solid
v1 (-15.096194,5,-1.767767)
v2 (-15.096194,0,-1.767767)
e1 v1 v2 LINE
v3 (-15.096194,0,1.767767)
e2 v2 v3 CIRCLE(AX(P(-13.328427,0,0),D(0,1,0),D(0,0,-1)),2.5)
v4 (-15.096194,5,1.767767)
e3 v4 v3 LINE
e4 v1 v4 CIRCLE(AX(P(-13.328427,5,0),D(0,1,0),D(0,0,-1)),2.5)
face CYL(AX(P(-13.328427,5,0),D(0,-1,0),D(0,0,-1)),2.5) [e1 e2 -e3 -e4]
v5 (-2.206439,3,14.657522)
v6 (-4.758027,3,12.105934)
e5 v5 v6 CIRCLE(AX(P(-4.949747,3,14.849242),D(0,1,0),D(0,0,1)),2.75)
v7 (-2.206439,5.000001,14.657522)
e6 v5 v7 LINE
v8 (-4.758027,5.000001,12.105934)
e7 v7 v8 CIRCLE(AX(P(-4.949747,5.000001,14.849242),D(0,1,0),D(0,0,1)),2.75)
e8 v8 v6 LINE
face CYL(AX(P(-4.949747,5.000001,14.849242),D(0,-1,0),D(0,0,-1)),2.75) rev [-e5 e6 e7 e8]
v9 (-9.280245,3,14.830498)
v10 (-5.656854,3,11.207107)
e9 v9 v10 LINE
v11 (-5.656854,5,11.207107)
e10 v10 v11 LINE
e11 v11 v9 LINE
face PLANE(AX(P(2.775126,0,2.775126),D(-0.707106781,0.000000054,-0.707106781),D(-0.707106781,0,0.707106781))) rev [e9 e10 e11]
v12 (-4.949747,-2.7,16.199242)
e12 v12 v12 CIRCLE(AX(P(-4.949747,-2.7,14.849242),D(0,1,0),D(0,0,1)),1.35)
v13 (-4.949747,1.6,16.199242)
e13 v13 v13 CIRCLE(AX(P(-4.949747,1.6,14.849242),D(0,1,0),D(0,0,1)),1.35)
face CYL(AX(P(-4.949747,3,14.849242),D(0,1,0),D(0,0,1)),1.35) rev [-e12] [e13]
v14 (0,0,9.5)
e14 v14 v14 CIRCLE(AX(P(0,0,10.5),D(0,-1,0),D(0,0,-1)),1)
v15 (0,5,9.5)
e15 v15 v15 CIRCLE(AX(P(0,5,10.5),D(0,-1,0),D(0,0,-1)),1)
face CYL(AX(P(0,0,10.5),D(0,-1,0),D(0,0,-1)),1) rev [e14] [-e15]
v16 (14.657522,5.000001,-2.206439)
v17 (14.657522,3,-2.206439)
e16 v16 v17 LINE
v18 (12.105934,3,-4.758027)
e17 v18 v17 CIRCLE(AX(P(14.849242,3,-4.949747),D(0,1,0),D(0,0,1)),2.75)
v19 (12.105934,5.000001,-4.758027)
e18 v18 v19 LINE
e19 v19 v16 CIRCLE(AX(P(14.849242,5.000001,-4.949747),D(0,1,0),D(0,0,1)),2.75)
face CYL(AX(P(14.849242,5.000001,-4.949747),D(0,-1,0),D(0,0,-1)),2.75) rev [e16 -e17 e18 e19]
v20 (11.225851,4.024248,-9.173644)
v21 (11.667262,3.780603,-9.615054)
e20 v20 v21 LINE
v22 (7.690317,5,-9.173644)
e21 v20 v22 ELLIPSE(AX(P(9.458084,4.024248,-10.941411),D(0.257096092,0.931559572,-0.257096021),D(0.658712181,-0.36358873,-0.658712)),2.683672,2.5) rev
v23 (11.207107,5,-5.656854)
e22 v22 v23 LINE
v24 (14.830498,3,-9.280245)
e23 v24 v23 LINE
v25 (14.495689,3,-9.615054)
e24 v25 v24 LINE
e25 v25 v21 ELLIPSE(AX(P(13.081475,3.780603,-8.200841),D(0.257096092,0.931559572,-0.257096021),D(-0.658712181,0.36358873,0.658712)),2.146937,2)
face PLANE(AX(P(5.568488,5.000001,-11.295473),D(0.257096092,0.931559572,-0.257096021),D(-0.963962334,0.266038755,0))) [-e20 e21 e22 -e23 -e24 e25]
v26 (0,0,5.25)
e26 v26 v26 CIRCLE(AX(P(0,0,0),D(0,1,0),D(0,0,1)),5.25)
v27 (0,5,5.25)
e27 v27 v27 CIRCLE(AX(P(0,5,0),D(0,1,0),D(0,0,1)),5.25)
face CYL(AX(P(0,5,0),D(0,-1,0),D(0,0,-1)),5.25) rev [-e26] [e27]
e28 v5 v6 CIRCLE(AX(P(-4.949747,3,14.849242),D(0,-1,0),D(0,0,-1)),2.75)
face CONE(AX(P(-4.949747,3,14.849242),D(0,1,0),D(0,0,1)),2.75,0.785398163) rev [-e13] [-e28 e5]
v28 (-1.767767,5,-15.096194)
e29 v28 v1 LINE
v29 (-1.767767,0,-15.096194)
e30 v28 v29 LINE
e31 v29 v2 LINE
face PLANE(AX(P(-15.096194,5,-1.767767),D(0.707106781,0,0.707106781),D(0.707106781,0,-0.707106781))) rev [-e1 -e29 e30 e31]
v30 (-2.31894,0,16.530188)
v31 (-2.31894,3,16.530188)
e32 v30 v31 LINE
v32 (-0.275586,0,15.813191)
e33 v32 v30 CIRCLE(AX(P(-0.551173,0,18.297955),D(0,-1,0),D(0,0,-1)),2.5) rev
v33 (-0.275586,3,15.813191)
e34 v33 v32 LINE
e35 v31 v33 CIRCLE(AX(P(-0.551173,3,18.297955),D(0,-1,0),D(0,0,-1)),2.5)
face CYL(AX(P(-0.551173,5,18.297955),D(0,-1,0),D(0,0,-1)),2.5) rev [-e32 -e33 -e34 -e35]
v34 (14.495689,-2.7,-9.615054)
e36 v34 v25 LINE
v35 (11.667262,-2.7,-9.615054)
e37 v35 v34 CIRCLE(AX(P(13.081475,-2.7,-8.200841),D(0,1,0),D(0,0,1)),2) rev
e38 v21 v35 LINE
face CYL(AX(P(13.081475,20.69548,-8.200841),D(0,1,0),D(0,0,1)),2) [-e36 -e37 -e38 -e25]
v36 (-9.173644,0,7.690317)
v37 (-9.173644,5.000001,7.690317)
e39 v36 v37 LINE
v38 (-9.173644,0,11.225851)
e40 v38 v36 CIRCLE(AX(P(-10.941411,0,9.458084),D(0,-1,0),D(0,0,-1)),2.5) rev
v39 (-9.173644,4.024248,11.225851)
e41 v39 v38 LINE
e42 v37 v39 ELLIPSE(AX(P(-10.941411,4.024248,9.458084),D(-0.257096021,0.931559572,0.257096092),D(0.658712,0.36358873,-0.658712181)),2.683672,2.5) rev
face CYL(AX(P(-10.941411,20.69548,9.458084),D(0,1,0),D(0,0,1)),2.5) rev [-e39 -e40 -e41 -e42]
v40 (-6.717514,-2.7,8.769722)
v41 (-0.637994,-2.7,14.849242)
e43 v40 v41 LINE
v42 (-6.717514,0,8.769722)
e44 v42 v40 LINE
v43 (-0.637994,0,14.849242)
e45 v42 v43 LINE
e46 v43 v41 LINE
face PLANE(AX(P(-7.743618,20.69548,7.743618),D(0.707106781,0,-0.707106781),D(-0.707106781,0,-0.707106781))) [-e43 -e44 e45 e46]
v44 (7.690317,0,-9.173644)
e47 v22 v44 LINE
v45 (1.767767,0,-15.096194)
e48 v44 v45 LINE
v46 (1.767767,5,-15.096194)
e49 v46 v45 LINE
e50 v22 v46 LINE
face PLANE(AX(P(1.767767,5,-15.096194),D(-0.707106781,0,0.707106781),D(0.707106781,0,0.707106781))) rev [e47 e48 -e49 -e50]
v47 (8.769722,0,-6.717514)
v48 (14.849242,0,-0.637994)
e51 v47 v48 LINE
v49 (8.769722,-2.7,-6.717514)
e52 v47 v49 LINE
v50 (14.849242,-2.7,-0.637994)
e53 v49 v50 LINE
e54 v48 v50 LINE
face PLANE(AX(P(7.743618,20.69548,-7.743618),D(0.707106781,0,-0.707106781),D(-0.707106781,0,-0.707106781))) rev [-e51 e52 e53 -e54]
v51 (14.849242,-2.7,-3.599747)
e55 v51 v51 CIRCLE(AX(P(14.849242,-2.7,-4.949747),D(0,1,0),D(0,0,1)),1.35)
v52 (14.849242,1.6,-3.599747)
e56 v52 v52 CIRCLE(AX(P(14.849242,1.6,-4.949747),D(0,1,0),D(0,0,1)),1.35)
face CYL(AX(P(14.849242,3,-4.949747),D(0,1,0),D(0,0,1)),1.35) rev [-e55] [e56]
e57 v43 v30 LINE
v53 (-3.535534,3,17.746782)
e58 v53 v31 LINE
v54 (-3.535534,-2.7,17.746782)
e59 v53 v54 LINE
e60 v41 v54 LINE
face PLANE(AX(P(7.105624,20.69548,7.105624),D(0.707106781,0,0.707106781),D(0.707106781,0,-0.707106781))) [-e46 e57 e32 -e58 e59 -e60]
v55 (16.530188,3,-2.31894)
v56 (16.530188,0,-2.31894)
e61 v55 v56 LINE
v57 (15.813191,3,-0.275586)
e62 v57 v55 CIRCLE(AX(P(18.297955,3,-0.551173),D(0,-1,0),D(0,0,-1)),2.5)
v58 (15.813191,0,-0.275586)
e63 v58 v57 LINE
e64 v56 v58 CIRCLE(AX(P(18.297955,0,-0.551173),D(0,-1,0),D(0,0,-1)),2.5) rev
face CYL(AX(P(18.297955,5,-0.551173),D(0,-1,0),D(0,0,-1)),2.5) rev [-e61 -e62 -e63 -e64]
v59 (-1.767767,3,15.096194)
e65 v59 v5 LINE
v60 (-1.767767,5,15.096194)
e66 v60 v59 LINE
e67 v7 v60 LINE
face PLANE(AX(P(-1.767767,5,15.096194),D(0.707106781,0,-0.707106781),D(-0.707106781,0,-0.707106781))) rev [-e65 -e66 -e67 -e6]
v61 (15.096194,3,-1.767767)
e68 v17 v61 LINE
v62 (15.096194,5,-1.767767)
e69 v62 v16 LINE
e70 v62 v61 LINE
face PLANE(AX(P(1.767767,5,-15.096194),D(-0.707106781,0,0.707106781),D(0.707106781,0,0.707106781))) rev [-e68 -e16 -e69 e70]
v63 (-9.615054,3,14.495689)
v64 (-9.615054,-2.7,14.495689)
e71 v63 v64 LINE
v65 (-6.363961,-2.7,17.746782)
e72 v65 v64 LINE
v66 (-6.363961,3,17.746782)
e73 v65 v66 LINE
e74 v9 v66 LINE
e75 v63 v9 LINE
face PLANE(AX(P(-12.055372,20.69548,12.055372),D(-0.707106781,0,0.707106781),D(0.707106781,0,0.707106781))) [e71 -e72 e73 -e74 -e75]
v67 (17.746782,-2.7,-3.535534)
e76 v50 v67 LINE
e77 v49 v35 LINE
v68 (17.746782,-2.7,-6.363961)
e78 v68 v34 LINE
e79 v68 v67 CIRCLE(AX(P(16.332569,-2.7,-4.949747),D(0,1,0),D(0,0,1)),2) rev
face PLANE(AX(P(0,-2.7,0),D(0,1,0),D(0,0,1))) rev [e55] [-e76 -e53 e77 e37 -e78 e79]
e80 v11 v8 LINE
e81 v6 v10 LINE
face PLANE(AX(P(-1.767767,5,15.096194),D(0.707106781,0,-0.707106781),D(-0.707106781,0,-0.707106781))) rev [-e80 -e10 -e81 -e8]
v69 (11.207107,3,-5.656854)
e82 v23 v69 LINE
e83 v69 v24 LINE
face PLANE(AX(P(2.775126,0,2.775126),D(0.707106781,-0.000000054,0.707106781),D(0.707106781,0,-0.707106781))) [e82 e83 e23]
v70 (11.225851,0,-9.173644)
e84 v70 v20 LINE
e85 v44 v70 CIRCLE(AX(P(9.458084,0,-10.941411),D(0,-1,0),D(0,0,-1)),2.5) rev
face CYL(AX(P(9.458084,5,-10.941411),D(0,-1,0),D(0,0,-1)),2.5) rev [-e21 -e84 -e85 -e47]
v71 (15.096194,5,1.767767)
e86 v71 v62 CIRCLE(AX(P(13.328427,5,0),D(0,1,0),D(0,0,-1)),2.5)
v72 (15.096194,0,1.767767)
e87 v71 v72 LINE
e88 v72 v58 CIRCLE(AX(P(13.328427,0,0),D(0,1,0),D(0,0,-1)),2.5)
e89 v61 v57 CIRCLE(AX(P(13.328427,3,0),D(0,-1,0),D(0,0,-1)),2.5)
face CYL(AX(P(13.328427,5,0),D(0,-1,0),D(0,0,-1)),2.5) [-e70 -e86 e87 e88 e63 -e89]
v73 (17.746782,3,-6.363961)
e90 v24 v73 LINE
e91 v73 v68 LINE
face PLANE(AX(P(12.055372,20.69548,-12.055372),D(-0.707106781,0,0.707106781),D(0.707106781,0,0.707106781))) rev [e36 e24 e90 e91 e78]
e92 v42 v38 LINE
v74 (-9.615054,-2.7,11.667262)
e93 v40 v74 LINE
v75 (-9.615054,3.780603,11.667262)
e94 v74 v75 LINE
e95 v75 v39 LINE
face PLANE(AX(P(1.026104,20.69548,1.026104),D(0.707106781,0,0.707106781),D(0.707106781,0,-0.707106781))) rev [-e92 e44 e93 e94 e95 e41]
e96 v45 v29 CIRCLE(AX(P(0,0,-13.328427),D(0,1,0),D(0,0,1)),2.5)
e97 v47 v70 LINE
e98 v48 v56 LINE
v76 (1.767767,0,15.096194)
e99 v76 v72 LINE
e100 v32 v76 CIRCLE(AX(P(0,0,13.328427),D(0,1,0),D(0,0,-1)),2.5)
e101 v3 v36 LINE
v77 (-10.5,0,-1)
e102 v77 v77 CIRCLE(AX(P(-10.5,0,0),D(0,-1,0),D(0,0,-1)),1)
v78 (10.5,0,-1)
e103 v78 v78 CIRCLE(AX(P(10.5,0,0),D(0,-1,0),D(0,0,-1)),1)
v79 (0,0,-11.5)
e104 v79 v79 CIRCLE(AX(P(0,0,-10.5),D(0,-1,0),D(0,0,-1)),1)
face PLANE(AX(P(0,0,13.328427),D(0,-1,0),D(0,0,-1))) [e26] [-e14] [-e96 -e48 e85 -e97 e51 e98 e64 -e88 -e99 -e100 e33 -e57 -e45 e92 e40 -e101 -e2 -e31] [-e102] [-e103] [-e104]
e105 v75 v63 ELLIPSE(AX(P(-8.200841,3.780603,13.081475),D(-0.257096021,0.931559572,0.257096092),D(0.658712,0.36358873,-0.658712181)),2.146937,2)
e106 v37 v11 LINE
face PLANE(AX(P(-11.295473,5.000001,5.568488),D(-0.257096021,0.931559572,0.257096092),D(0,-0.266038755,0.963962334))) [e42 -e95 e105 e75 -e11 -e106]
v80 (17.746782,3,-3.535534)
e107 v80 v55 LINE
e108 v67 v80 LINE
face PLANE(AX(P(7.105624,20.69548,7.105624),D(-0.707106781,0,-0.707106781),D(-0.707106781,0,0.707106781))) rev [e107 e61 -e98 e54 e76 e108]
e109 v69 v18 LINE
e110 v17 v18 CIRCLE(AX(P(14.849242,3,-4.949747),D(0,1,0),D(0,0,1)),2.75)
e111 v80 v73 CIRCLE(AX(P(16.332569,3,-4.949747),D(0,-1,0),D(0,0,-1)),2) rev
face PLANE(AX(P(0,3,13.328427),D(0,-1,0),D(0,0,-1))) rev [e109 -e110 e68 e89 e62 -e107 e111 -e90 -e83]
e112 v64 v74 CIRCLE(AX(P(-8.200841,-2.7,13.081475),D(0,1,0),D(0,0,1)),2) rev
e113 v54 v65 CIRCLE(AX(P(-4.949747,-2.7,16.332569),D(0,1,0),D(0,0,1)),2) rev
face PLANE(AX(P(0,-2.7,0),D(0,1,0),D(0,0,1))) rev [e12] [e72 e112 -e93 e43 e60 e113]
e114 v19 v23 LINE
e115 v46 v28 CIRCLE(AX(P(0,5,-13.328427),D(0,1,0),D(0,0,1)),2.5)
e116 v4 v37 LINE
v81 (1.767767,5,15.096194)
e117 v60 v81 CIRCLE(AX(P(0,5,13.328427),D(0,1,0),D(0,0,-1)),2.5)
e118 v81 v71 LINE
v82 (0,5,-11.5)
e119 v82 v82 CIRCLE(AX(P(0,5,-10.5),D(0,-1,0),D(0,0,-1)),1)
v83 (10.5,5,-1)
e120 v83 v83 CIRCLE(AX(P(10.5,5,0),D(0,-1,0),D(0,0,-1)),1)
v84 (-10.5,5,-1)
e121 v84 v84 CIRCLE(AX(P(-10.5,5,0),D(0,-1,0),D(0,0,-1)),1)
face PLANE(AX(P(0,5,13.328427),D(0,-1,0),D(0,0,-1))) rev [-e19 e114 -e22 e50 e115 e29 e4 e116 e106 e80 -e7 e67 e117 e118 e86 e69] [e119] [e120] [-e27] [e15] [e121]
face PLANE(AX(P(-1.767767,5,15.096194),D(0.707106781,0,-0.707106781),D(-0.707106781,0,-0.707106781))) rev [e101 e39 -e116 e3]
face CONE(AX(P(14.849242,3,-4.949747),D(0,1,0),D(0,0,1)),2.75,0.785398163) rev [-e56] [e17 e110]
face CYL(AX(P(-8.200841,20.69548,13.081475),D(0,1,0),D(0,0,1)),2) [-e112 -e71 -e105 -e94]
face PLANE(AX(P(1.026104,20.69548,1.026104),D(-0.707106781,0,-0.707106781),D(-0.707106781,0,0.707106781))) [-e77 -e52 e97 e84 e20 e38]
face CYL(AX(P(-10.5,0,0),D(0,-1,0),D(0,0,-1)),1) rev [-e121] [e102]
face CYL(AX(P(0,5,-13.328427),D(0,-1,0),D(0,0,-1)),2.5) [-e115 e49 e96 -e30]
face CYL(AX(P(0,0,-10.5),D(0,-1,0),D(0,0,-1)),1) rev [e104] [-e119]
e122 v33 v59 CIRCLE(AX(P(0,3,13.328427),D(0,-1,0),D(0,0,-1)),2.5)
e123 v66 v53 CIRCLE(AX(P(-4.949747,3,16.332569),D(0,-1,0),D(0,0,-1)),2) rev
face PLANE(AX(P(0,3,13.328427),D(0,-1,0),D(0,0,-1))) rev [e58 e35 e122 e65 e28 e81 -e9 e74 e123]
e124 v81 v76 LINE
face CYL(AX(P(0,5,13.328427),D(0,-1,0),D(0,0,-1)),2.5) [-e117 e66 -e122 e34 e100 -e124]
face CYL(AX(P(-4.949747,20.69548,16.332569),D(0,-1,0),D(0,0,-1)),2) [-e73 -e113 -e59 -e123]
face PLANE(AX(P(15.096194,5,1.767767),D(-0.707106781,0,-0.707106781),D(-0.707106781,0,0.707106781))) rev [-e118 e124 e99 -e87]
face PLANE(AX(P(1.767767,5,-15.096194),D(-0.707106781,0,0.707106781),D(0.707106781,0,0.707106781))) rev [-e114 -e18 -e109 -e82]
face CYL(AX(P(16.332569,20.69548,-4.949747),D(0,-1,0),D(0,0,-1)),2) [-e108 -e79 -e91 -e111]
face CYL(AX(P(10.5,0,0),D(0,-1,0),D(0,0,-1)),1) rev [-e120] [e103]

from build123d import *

# Parameters (mm, degrees)
SKETCH1_R                                      = 0.5
SKETCH1_R_2                                    = 5.25
BOSS_EXTRUDE1_DEPTH                            = 5
SKETCH3_R                                      = 1.3
BOSS_EXTRUDE4_DEPTH                            = 5.7
BOSS_EXTRUDE6_DEPTH                            = 2.473491095
FILLET1_R                                      = 2.5
FILLET2_R                                      = 2
F_2_0MM_DOWEL_HOLE1_D                          = 2
F_2_0MM_DOWEL_HOLE1_DEPTH                      = 42.93
F_2_0MM_DOWEL_HOLE1_TIP                        = 0.600860619
CSK_FOR_M2_5_FLAT_HEAD_MACHINE_SCREW1_AT_COUNT = 2
CSK_FOR_M2_5_FLAT_HEAD_MACHINE_SCREW1_AT_PITCH = 28
SKETCH14_R                                     = 2.75
CUT_EXTRUDE1_DEPTH                             = 27.54536008


with BuildPart() as part:
    # Sketch1 → Boss-Extrude1 (new body)
    with BuildSketch(Plane(origin=(0, 0, 0), x_dir=(1, 0, 0), z_dir=(0, 1, 0))):
        with BuildLine():
            Line((1.767766953, 15.096194078), (15.096194078, 1.767766953))
            ThreePointArc((15.096194078, 1.767766953), (15.828427125, 0), (15.096194078, -1.767766953))
            Line((15.096194078, -1.767766953), (1.767766953, -15.096194078))
            ThreePointArc((1.767766953, -15.096194078), (0, -15.828427125), (-1.767766953, -15.096194078))
            Line((-1.767766953, -15.096194078), (-15.096194078, -1.767766953))
            ThreePointArc((-15.096194078, -1.767766953), (-15.828427125, 0), (-15.096194078, 1.767766953))
            Line((-15.096194078, 1.767766953), (-1.767766953, 15.096194078))
            ThreePointArc((-1.767766953, 15.096194078), (0, 15.828427125), (1.767766953, 15.096194078))
        make_face()
        with Locations(Location((0, 10.5, 0), (0, 0, 270))):
            Circle(SKETCH1_R, mode=Mode.SUBTRACT)
        with Locations(Location((0, -10.5, 0), (0, 0, 270))):
            Circle(SKETCH1_R, mode=Mode.SUBTRACT)
        with Locations(Location((10.5, 0, 0), (0, 0, 270))):
            Circle(SKETCH1_R, mode=Mode.SUBTRACT)
        with Locations(Location((-10.5, 0, 0), (0, 0, 270))):
            Circle(SKETCH1_R, mode=Mode.SUBTRACT)
        with Locations(Location((0, 0, 0), (0, 0, 270))):
            Circle(SKETCH1_R_2, mode=Mode.SUBTRACT)
    extrude(amount=BOSS_EXTRUDE1_DEPTH)

    # Sketch3 → Boss-Extrude4 (add)
    # profile 1 of 4: a face of its own
    with BuildSketch(Plane(origin=(0, -2.7, 0), x_dir=(1, 0, 0), z_dir=(0, 1, 0))):
        Polygon((-4.949747468, -10.537489101), (-0.637994164, -14.849242405), (-4.949747468, -19.160995709), (-9.261500772, -14.849242405), align=None)
        with Locations(Location((-4.949747468, -14.849242405, 0), (0, 0, 90))):
            Circle(SKETCH3_R, mode=Mode.SUBTRACT)
    # profile 2 of 4: a face of its own
    with BuildSketch(Plane(origin=(0, -2.7, 0), x_dir=(1, 0, 0), z_dir=(0, 1, 0))):
        Polygon((-6.717514421, -8.769722148), (-11.029267725, -13.081475452), (-9.261500772, -14.849242405), (-4.949747468, -10.537489101), align=None)
    # profile 3 of 4: a face of its own
    with BuildSketch(Plane(origin=(0, -2.7, 0), x_dir=(1, 0, 0), z_dir=(0, 1, 0))):
        Polygon((19.160995709, 4.949747468), (14.849242405, 9.261500772), (10.537489101, 4.949747468), (14.849242405, 0.637994164), align=None)
        with Locations(Location((14.849242405, 4.949747468, 0), (0, 0, 90))):
            Circle(SKETCH3_R, mode=Mode.SUBTRACT)
    # profile 4 of 4: a face of its own
    with BuildSketch(Plane(origin=(0, -2.7, 0), x_dir=(1, 0, 0), z_dir=(0, 1, 0))):
        Polygon((13.081475452, 11.029267725), (14.849242405, 9.261500772), (10.537489101, 4.949747468), (8.769722148, 6.717514421), align=None)
    extrude(amount=BOSS_EXTRUDE4_DEPTH)


with BuildPart() as boss_extrude6_tool:
    # Sketch7 → Boss-Extrude6 (new body)
    with BuildSketch(Plane(origin=(2.775126076, -2.11e-07, 2.775126076), x_dir=(0.7071067811865474, 0, -0.7071067811865478), z_dir=(0.7071067811865468, -5.372690076738491e-08, 0.7071067811865464))):
        Polygon((11.924621202, 5.000000506), (17.04887, 3.00000054), (11.924621202, 3.000000506), align=None)
        Polygon((-11.924621202, 5.000000506), (-17.04887, 3.00000054), (-11.924621202, 3.000000506), align=None)
    extrude(amount=-BOSS_EXTRUDE6_DEPTH)


with BuildPart() as part_1:
    add(part.part)


with BuildPart() as part_2:
    # Boss-Extrude6: joined with boss_extrude6_tool
    add(part_1.part.fuse(boss_extrude6_tool.part, tol=0.00001))

    # Fillet1
    fillet1_edges = [part_2.edges().sort_by_distance(p)[0] for p in [
        (-7.405876652, 1.5, 9.458084379),
        (-1.270359497, 1.5, 15.481607737),
        (9.458084379, 1.5, -7.405876652),
        (15.481607737, 1.5, -1.270359497),
    ]]
    fillet(fillet1_edges, radius=FILLET1_R)

    # Fillet2
    # the kernel refuses this fillet: 2 mm, written as the material it takes off along each edge
    with BuildSketch(Plane(origin=(-4.949747468, -7.7, 19.160995709), x_dir=(0.7071067811865477, 0, -0.7071067811865475), z_dir=(0, 1, 0)), Plane(origin=(13.081475452, -7.7, -11.029267725), x_dir=(-0.7071067811865471, 0, 0.707106781186548), z_dir=(0, 1, 0)), Plane(origin=(19.160995709, -7.7, -4.949747468), x_dir=(-0.7071067811865482, 0, -0.7071067811865469), z_dir=(0, 1, 0))) as fillet2_piece_1:
        with BuildLine():
            CenterArc((FILLET2_R, FILLET2_R), FILLET2_R, 180, 90)
            Line((0, FILLET2_R), (0, 0))
            Line((0, 0), (FILLET2_R, 0))
        make_face()
    extrude(amount=15.7, mode=Mode.SUBTRACT)
    with BuildSketch(Plane(origin=(-11.029267725, -7.7, 13.081475452), x_dir=(0.7071067811865476, 0, -0.7071067811865476), z_dir=(0, 1, 0))) as fillet2_piece_2:
        with BuildLine():
            CenterArc((FILLET2_R, -FILLET2_R), FILLET2_R, 90, 90)
            Line((0, -FILLET2_R), (0, 0))
            Line((0, 0), (FILLET2_R, 0))
        make_face()
    extrude(amount=15.7, mode=Mode.SUBTRACT)

    # Ø2.0mm Dowel Hole1
    with Locations(Plane.XZ):
        with Locations((0, 10.5), (10.5, 0), (-10.5, 0), (0, -10.5)):
            Hole(F_2_0MM_DOWEL_HOLE1_D / 2, depth=F_2_0MM_DOWEL_HOLE1_DEPTH)
            with Locations((0, 0, -(F_2_0MM_DOWEL_HOLE1_DEPTH + F_2_0MM_DOWEL_HOLE1_TIP / 2))):  # 118° drill point
                Cone(0, F_2_0MM_DOWEL_HOLE1_D / 2, F_2_0MM_DOWEL_HOLE1_TIP, mode=Mode.SUBTRACT)

    # Sketch12 → CSK for M2.5 Flat Head Machine Screw1 (revolve, cut)
    with BuildSketch(Plane(origin=(-4.949747468, 3, 14.849242405), x_dir=(0, 0, 1), z_dir=(1, 0, 0))):
        Polygon((0, 0), (0, 5.7), (1.35, 5.7), (1.35, 1.4), (2.75, 0), align=None)
    csk_for_m2_5_flat_head_machine_screw1 = revolve(axis=Axis((-4.949747468, 9.35, 14.849242405), (0, -1, 0)), mode=Mode.SUBTRACT)

    # CSK for M2.5 Flat Head Machine Screw1 at: CSK for M2.5 Flat Head Machine Screw1 ×2
    with Locations(*[Vector(0.7071067811865477, 0, -0.7071067811865475) * (i * CSK_FOR_M2_5_FLAT_HEAD_MACHINE_SCREW1_AT_PITCH) for i in range(1, CSK_FOR_M2_5_FLAT_HEAD_MACHINE_SCREW1_AT_COUNT)]):
        add(csk_for_m2_5_flat_head_machine_screw1, mode=Mode.SUBTRACT)

    # Sketch14 → Cut-Extrude1 (cut, through all)
    with BuildSketch(Plane(origin=(0, 3, 0), x_dir=(1, 0, 0), z_dir=(0, 1, 0))):
        with Locations((-4.949747468, -14.849242405)):
            Circle(SKETCH14_R)
        with Locations((14.849242405, 4.949747468)):
            Circle(SKETCH14_R)
    extrude(amount=CUT_EXTRUDE1_DEPTH, mode=Mode.SUBTRACT)


solid = part_2.part
